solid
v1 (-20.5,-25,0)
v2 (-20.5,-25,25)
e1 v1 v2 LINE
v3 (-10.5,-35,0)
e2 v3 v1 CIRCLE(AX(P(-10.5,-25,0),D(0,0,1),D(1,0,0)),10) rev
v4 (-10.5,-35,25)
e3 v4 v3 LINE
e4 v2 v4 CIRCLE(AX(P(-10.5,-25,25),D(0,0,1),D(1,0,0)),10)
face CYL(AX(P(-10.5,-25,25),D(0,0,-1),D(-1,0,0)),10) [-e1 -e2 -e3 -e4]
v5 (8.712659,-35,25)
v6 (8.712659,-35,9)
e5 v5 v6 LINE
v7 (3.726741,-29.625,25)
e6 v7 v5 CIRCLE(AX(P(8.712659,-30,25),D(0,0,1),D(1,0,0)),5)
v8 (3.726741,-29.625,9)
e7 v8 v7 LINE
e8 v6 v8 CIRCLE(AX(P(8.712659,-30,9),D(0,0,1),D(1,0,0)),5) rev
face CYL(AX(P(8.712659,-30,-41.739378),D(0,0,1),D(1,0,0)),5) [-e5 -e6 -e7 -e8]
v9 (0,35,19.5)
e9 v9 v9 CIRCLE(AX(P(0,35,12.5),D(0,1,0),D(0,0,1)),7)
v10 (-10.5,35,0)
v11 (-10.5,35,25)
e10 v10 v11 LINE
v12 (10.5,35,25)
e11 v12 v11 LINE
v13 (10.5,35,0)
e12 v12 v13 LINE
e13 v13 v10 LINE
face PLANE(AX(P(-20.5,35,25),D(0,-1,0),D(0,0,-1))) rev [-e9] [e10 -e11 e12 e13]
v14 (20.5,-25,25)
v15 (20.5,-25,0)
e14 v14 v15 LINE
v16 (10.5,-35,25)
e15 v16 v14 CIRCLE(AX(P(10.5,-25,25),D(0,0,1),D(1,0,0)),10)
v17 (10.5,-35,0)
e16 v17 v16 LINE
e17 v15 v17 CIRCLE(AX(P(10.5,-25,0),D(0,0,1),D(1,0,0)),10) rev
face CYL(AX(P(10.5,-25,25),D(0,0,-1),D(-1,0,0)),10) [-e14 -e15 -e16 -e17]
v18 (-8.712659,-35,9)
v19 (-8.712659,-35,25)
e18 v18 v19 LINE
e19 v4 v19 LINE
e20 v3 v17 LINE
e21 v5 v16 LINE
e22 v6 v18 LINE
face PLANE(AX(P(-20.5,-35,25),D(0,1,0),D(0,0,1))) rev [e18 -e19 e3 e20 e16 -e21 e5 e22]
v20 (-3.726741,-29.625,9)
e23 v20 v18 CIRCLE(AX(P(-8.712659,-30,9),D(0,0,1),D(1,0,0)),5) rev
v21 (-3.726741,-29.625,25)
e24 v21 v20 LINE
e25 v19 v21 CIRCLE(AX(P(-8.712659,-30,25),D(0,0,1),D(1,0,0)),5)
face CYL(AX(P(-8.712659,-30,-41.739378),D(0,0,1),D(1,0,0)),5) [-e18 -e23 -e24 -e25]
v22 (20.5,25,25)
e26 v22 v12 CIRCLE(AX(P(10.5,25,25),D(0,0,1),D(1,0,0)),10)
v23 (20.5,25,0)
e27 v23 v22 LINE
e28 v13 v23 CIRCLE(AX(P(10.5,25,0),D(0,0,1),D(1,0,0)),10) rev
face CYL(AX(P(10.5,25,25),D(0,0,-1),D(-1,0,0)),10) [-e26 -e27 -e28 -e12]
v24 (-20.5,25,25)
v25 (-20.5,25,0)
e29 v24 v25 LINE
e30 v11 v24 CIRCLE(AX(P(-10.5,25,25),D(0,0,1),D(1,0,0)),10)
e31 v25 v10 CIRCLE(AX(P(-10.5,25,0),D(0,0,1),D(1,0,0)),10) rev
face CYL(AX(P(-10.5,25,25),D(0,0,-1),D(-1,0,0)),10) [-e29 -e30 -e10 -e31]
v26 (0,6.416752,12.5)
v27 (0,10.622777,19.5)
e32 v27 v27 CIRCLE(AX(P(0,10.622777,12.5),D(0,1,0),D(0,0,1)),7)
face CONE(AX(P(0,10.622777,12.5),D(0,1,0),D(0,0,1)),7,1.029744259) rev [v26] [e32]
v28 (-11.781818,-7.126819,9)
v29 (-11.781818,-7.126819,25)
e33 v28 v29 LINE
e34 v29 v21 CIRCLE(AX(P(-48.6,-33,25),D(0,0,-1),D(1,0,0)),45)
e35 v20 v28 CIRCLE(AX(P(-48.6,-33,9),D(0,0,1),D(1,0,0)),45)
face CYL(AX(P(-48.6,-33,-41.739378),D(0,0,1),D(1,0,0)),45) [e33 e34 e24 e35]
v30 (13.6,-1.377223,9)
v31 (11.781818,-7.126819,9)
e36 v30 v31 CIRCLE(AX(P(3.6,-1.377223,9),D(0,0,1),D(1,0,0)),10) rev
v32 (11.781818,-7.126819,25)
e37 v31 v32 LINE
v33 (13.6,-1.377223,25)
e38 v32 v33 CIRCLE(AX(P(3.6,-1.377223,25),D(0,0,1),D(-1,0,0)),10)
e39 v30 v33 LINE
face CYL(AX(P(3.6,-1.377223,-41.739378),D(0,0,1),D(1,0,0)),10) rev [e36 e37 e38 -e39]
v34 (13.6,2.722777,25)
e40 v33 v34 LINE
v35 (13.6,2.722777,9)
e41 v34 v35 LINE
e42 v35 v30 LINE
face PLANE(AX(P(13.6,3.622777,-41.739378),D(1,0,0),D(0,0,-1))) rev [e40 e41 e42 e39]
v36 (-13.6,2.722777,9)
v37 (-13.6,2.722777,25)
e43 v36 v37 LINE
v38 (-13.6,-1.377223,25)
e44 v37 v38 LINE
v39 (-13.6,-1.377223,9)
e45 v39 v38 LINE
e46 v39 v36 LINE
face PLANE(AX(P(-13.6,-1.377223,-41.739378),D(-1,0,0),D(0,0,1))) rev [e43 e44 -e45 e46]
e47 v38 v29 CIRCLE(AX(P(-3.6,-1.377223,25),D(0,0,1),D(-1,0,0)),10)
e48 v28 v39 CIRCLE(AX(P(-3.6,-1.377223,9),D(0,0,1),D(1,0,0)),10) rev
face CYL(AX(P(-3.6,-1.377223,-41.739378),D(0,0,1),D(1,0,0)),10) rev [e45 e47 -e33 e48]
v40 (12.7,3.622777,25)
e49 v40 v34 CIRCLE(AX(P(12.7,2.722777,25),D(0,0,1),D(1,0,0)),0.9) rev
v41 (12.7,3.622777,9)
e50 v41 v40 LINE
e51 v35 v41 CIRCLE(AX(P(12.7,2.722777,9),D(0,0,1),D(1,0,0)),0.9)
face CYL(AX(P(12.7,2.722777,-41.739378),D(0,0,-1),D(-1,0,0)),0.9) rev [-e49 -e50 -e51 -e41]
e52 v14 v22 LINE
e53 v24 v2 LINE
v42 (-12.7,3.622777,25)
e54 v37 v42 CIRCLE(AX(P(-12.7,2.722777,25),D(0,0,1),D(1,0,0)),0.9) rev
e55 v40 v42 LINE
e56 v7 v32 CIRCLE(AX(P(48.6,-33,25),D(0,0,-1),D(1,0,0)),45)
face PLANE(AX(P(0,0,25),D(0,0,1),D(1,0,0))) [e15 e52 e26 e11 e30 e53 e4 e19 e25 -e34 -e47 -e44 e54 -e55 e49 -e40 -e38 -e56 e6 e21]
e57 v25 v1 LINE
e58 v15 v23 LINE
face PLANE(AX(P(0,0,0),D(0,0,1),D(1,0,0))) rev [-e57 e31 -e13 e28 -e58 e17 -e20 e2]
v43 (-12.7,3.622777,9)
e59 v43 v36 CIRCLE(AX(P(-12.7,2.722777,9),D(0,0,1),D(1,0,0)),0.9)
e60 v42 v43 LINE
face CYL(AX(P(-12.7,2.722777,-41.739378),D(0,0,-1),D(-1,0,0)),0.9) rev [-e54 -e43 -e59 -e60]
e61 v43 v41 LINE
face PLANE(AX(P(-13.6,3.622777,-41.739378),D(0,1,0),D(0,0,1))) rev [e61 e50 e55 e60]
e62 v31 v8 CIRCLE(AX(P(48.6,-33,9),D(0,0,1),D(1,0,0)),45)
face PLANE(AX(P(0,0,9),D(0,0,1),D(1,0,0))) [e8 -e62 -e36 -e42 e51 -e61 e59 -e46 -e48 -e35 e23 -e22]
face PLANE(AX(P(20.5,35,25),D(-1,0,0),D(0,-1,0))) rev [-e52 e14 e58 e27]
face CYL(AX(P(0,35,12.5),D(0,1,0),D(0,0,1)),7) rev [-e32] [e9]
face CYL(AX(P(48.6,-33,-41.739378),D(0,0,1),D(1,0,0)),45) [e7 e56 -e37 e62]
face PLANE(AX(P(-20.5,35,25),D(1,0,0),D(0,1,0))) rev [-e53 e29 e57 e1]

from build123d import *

# Parameters (mm, degrees)
SKETCH1_W                        = 41
SKETCH1_H                        = 70
BOSS_EXTRUDE1_DEPTH              = 25
CUT_EXTRUDE1_DEPTH               = 16
TAP_DRILL_FOR_M16X2_0_TAP1_D     = 14
TAP_DRILL_FOR_M16X2_0_TAP1_DEPTH = 24.377223398
TAP_DRILL_FOR_M16X2_0_TAP1_TIP   = 4.206024333
FILLET1_R                        = 10
FILLET2_R                        = 0.9
FILLET4_R                        = 5


with BuildPart() as part:
    # Sketch1 → Boss-Extrude1 (new body)
    with BuildSketch(Plane.XY):
        Rectangle(SKETCH1_W, SKETCH1_H)
    extrude(amount=BOSS_EXTRUDE1_DEPTH)

    # Sketch6 → Cut-Extrude1 (cut)
    with BuildSketch(Plane.XY.offset(25)):
        with BuildLine():
            Line((-3.6, -35), (-3.6, -33))
            ThreePointArc((-3.6, -33), (-5.694183484, -19.431989494), (-11.781818182, -7.126819144))
            ThreePointArc((-11.781818182, -7.126819144), (-13.134625892, -4.392336844), (-13.6, -1.377223398))
            Line((-13.6, -1.377223398), (-13.6, 3.622776602))
            Line((-13.6, 3.622776602), (13.6, 3.622776602))
            Line((13.6, 3.622776602), (13.6, -1.377223398))
            ThreePointArc((13.6, -1.377223398), (13.134625892, -4.392336844), (11.781818182, -7.126819144))
            ThreePointArc((11.781818182, -7.126819144), (5.694183484, -19.431989494), (3.6, -33))
            Line((3.6, -33), (3.6, -35))
            Line((3.6, -35), (-3.6, -35))
        make_face()
    extrude(amount=-CUT_EXTRUDE1_DEPTH, mode=Mode.SUBTRACT)

    # Tap Drill for M16x2.0 Tap1
    with Locations(Plane(origin=(0, 35, 0), x_dir=(1, 0, 0), z_dir=(0, 1, 0))):
        with Locations((0, -12.5)):
            Hole(TAP_DRILL_FOR_M16X2_0_TAP1_D / 2, depth=TAP_DRILL_FOR_M16X2_0_TAP1_DEPTH)
            with Locations((0, 0, -(TAP_DRILL_FOR_M16X2_0_TAP1_DEPTH + TAP_DRILL_FOR_M16X2_0_TAP1_TIP / 2))):  # 118° drill point
                Cone(0, TAP_DRILL_FOR_M16X2_0_TAP1_D / 2, TAP_DRILL_FOR_M16X2_0_TAP1_TIP, mode=Mode.SUBTRACT)

    # Fillet1
    fillet1_edges = [part.edges().sort_by_distance(p)[0] for p in [
        (20.5, -35, 12.5),
        (-20.5, -35, 12.5),
        (-20.5, 35, 12.5),
        (20.5, 35, 12.5),
    ]]
    fillet(fillet1_edges, radius=FILLET1_R)

    # Fillet2
    fillet2_edges = [part.edges().sort_by_distance(p)[0] for p in [
        (-13.6, 3.622776602, 17),
        (13.6, 3.622776602, 17),
    ]]
    fillet(fillet2_edges, radius=FILLET2_R)

    # Fillet4
    # the kernel refuses this fillet: 5 mm, written as the material it takes off along each edge
    with BuildSketch(Plane(origin=(3.6, -35, 38.441235127), x_dir=(1, 0, 0), z_dir=(0, 0, -1))) as fillet4_piece_1:
        with BuildLine():
            CenterArc((5.11265865, -5), FILLET4_R, 90, 94.301222305)
            Line((0.126740981, -5.375), (-0.371850786, -5.4125))
            ThreePointArc((-0.371850786, -5.4125), (-0.5, -2), (-0.5, 0))
            Line((-0.5, 0), (0, 0.5))
            Line((0, 0.5), (5.11265865, 0.5))
            Line((5.11265865, 0.5), (5.11265865, 0))
        make_face()
    extrude(amount=29.441235127, mode=Mode.SUBTRACT)
    with BuildSketch(Plane(origin=(-3.6, -35, 38.441235127), x_dir=(-0.0235731649015064, 0.9997221143380427, 0), z_dir=(0, 0, -1))) as fillet4_piece_2:
        with BuildLine():
            CenterArc((5.119132117, -4.993372091), FILLET4_R, 87.049545676, 94.301222305)
            Line((0.120521545, -5.111237915), (-0.379339512, -5.123024498))
            Line((-0.379339512, -5.123024498), (-0.499861057, -0.011786582))
            Line((-0.499861057, -0.011786582), (-0.011786582, 0.499861057))
            ThreePointArc((-0.011786582, 0.499861057), (1.987657646, 0.547007387), (5.402230244, 0.499337209))
            Line((5.402230244, 0.499337209), (5.376494051, 0))
        make_face()
    extrude(amount=29.441235127, mode=Mode.SUBTRACT)


solid = part.part
